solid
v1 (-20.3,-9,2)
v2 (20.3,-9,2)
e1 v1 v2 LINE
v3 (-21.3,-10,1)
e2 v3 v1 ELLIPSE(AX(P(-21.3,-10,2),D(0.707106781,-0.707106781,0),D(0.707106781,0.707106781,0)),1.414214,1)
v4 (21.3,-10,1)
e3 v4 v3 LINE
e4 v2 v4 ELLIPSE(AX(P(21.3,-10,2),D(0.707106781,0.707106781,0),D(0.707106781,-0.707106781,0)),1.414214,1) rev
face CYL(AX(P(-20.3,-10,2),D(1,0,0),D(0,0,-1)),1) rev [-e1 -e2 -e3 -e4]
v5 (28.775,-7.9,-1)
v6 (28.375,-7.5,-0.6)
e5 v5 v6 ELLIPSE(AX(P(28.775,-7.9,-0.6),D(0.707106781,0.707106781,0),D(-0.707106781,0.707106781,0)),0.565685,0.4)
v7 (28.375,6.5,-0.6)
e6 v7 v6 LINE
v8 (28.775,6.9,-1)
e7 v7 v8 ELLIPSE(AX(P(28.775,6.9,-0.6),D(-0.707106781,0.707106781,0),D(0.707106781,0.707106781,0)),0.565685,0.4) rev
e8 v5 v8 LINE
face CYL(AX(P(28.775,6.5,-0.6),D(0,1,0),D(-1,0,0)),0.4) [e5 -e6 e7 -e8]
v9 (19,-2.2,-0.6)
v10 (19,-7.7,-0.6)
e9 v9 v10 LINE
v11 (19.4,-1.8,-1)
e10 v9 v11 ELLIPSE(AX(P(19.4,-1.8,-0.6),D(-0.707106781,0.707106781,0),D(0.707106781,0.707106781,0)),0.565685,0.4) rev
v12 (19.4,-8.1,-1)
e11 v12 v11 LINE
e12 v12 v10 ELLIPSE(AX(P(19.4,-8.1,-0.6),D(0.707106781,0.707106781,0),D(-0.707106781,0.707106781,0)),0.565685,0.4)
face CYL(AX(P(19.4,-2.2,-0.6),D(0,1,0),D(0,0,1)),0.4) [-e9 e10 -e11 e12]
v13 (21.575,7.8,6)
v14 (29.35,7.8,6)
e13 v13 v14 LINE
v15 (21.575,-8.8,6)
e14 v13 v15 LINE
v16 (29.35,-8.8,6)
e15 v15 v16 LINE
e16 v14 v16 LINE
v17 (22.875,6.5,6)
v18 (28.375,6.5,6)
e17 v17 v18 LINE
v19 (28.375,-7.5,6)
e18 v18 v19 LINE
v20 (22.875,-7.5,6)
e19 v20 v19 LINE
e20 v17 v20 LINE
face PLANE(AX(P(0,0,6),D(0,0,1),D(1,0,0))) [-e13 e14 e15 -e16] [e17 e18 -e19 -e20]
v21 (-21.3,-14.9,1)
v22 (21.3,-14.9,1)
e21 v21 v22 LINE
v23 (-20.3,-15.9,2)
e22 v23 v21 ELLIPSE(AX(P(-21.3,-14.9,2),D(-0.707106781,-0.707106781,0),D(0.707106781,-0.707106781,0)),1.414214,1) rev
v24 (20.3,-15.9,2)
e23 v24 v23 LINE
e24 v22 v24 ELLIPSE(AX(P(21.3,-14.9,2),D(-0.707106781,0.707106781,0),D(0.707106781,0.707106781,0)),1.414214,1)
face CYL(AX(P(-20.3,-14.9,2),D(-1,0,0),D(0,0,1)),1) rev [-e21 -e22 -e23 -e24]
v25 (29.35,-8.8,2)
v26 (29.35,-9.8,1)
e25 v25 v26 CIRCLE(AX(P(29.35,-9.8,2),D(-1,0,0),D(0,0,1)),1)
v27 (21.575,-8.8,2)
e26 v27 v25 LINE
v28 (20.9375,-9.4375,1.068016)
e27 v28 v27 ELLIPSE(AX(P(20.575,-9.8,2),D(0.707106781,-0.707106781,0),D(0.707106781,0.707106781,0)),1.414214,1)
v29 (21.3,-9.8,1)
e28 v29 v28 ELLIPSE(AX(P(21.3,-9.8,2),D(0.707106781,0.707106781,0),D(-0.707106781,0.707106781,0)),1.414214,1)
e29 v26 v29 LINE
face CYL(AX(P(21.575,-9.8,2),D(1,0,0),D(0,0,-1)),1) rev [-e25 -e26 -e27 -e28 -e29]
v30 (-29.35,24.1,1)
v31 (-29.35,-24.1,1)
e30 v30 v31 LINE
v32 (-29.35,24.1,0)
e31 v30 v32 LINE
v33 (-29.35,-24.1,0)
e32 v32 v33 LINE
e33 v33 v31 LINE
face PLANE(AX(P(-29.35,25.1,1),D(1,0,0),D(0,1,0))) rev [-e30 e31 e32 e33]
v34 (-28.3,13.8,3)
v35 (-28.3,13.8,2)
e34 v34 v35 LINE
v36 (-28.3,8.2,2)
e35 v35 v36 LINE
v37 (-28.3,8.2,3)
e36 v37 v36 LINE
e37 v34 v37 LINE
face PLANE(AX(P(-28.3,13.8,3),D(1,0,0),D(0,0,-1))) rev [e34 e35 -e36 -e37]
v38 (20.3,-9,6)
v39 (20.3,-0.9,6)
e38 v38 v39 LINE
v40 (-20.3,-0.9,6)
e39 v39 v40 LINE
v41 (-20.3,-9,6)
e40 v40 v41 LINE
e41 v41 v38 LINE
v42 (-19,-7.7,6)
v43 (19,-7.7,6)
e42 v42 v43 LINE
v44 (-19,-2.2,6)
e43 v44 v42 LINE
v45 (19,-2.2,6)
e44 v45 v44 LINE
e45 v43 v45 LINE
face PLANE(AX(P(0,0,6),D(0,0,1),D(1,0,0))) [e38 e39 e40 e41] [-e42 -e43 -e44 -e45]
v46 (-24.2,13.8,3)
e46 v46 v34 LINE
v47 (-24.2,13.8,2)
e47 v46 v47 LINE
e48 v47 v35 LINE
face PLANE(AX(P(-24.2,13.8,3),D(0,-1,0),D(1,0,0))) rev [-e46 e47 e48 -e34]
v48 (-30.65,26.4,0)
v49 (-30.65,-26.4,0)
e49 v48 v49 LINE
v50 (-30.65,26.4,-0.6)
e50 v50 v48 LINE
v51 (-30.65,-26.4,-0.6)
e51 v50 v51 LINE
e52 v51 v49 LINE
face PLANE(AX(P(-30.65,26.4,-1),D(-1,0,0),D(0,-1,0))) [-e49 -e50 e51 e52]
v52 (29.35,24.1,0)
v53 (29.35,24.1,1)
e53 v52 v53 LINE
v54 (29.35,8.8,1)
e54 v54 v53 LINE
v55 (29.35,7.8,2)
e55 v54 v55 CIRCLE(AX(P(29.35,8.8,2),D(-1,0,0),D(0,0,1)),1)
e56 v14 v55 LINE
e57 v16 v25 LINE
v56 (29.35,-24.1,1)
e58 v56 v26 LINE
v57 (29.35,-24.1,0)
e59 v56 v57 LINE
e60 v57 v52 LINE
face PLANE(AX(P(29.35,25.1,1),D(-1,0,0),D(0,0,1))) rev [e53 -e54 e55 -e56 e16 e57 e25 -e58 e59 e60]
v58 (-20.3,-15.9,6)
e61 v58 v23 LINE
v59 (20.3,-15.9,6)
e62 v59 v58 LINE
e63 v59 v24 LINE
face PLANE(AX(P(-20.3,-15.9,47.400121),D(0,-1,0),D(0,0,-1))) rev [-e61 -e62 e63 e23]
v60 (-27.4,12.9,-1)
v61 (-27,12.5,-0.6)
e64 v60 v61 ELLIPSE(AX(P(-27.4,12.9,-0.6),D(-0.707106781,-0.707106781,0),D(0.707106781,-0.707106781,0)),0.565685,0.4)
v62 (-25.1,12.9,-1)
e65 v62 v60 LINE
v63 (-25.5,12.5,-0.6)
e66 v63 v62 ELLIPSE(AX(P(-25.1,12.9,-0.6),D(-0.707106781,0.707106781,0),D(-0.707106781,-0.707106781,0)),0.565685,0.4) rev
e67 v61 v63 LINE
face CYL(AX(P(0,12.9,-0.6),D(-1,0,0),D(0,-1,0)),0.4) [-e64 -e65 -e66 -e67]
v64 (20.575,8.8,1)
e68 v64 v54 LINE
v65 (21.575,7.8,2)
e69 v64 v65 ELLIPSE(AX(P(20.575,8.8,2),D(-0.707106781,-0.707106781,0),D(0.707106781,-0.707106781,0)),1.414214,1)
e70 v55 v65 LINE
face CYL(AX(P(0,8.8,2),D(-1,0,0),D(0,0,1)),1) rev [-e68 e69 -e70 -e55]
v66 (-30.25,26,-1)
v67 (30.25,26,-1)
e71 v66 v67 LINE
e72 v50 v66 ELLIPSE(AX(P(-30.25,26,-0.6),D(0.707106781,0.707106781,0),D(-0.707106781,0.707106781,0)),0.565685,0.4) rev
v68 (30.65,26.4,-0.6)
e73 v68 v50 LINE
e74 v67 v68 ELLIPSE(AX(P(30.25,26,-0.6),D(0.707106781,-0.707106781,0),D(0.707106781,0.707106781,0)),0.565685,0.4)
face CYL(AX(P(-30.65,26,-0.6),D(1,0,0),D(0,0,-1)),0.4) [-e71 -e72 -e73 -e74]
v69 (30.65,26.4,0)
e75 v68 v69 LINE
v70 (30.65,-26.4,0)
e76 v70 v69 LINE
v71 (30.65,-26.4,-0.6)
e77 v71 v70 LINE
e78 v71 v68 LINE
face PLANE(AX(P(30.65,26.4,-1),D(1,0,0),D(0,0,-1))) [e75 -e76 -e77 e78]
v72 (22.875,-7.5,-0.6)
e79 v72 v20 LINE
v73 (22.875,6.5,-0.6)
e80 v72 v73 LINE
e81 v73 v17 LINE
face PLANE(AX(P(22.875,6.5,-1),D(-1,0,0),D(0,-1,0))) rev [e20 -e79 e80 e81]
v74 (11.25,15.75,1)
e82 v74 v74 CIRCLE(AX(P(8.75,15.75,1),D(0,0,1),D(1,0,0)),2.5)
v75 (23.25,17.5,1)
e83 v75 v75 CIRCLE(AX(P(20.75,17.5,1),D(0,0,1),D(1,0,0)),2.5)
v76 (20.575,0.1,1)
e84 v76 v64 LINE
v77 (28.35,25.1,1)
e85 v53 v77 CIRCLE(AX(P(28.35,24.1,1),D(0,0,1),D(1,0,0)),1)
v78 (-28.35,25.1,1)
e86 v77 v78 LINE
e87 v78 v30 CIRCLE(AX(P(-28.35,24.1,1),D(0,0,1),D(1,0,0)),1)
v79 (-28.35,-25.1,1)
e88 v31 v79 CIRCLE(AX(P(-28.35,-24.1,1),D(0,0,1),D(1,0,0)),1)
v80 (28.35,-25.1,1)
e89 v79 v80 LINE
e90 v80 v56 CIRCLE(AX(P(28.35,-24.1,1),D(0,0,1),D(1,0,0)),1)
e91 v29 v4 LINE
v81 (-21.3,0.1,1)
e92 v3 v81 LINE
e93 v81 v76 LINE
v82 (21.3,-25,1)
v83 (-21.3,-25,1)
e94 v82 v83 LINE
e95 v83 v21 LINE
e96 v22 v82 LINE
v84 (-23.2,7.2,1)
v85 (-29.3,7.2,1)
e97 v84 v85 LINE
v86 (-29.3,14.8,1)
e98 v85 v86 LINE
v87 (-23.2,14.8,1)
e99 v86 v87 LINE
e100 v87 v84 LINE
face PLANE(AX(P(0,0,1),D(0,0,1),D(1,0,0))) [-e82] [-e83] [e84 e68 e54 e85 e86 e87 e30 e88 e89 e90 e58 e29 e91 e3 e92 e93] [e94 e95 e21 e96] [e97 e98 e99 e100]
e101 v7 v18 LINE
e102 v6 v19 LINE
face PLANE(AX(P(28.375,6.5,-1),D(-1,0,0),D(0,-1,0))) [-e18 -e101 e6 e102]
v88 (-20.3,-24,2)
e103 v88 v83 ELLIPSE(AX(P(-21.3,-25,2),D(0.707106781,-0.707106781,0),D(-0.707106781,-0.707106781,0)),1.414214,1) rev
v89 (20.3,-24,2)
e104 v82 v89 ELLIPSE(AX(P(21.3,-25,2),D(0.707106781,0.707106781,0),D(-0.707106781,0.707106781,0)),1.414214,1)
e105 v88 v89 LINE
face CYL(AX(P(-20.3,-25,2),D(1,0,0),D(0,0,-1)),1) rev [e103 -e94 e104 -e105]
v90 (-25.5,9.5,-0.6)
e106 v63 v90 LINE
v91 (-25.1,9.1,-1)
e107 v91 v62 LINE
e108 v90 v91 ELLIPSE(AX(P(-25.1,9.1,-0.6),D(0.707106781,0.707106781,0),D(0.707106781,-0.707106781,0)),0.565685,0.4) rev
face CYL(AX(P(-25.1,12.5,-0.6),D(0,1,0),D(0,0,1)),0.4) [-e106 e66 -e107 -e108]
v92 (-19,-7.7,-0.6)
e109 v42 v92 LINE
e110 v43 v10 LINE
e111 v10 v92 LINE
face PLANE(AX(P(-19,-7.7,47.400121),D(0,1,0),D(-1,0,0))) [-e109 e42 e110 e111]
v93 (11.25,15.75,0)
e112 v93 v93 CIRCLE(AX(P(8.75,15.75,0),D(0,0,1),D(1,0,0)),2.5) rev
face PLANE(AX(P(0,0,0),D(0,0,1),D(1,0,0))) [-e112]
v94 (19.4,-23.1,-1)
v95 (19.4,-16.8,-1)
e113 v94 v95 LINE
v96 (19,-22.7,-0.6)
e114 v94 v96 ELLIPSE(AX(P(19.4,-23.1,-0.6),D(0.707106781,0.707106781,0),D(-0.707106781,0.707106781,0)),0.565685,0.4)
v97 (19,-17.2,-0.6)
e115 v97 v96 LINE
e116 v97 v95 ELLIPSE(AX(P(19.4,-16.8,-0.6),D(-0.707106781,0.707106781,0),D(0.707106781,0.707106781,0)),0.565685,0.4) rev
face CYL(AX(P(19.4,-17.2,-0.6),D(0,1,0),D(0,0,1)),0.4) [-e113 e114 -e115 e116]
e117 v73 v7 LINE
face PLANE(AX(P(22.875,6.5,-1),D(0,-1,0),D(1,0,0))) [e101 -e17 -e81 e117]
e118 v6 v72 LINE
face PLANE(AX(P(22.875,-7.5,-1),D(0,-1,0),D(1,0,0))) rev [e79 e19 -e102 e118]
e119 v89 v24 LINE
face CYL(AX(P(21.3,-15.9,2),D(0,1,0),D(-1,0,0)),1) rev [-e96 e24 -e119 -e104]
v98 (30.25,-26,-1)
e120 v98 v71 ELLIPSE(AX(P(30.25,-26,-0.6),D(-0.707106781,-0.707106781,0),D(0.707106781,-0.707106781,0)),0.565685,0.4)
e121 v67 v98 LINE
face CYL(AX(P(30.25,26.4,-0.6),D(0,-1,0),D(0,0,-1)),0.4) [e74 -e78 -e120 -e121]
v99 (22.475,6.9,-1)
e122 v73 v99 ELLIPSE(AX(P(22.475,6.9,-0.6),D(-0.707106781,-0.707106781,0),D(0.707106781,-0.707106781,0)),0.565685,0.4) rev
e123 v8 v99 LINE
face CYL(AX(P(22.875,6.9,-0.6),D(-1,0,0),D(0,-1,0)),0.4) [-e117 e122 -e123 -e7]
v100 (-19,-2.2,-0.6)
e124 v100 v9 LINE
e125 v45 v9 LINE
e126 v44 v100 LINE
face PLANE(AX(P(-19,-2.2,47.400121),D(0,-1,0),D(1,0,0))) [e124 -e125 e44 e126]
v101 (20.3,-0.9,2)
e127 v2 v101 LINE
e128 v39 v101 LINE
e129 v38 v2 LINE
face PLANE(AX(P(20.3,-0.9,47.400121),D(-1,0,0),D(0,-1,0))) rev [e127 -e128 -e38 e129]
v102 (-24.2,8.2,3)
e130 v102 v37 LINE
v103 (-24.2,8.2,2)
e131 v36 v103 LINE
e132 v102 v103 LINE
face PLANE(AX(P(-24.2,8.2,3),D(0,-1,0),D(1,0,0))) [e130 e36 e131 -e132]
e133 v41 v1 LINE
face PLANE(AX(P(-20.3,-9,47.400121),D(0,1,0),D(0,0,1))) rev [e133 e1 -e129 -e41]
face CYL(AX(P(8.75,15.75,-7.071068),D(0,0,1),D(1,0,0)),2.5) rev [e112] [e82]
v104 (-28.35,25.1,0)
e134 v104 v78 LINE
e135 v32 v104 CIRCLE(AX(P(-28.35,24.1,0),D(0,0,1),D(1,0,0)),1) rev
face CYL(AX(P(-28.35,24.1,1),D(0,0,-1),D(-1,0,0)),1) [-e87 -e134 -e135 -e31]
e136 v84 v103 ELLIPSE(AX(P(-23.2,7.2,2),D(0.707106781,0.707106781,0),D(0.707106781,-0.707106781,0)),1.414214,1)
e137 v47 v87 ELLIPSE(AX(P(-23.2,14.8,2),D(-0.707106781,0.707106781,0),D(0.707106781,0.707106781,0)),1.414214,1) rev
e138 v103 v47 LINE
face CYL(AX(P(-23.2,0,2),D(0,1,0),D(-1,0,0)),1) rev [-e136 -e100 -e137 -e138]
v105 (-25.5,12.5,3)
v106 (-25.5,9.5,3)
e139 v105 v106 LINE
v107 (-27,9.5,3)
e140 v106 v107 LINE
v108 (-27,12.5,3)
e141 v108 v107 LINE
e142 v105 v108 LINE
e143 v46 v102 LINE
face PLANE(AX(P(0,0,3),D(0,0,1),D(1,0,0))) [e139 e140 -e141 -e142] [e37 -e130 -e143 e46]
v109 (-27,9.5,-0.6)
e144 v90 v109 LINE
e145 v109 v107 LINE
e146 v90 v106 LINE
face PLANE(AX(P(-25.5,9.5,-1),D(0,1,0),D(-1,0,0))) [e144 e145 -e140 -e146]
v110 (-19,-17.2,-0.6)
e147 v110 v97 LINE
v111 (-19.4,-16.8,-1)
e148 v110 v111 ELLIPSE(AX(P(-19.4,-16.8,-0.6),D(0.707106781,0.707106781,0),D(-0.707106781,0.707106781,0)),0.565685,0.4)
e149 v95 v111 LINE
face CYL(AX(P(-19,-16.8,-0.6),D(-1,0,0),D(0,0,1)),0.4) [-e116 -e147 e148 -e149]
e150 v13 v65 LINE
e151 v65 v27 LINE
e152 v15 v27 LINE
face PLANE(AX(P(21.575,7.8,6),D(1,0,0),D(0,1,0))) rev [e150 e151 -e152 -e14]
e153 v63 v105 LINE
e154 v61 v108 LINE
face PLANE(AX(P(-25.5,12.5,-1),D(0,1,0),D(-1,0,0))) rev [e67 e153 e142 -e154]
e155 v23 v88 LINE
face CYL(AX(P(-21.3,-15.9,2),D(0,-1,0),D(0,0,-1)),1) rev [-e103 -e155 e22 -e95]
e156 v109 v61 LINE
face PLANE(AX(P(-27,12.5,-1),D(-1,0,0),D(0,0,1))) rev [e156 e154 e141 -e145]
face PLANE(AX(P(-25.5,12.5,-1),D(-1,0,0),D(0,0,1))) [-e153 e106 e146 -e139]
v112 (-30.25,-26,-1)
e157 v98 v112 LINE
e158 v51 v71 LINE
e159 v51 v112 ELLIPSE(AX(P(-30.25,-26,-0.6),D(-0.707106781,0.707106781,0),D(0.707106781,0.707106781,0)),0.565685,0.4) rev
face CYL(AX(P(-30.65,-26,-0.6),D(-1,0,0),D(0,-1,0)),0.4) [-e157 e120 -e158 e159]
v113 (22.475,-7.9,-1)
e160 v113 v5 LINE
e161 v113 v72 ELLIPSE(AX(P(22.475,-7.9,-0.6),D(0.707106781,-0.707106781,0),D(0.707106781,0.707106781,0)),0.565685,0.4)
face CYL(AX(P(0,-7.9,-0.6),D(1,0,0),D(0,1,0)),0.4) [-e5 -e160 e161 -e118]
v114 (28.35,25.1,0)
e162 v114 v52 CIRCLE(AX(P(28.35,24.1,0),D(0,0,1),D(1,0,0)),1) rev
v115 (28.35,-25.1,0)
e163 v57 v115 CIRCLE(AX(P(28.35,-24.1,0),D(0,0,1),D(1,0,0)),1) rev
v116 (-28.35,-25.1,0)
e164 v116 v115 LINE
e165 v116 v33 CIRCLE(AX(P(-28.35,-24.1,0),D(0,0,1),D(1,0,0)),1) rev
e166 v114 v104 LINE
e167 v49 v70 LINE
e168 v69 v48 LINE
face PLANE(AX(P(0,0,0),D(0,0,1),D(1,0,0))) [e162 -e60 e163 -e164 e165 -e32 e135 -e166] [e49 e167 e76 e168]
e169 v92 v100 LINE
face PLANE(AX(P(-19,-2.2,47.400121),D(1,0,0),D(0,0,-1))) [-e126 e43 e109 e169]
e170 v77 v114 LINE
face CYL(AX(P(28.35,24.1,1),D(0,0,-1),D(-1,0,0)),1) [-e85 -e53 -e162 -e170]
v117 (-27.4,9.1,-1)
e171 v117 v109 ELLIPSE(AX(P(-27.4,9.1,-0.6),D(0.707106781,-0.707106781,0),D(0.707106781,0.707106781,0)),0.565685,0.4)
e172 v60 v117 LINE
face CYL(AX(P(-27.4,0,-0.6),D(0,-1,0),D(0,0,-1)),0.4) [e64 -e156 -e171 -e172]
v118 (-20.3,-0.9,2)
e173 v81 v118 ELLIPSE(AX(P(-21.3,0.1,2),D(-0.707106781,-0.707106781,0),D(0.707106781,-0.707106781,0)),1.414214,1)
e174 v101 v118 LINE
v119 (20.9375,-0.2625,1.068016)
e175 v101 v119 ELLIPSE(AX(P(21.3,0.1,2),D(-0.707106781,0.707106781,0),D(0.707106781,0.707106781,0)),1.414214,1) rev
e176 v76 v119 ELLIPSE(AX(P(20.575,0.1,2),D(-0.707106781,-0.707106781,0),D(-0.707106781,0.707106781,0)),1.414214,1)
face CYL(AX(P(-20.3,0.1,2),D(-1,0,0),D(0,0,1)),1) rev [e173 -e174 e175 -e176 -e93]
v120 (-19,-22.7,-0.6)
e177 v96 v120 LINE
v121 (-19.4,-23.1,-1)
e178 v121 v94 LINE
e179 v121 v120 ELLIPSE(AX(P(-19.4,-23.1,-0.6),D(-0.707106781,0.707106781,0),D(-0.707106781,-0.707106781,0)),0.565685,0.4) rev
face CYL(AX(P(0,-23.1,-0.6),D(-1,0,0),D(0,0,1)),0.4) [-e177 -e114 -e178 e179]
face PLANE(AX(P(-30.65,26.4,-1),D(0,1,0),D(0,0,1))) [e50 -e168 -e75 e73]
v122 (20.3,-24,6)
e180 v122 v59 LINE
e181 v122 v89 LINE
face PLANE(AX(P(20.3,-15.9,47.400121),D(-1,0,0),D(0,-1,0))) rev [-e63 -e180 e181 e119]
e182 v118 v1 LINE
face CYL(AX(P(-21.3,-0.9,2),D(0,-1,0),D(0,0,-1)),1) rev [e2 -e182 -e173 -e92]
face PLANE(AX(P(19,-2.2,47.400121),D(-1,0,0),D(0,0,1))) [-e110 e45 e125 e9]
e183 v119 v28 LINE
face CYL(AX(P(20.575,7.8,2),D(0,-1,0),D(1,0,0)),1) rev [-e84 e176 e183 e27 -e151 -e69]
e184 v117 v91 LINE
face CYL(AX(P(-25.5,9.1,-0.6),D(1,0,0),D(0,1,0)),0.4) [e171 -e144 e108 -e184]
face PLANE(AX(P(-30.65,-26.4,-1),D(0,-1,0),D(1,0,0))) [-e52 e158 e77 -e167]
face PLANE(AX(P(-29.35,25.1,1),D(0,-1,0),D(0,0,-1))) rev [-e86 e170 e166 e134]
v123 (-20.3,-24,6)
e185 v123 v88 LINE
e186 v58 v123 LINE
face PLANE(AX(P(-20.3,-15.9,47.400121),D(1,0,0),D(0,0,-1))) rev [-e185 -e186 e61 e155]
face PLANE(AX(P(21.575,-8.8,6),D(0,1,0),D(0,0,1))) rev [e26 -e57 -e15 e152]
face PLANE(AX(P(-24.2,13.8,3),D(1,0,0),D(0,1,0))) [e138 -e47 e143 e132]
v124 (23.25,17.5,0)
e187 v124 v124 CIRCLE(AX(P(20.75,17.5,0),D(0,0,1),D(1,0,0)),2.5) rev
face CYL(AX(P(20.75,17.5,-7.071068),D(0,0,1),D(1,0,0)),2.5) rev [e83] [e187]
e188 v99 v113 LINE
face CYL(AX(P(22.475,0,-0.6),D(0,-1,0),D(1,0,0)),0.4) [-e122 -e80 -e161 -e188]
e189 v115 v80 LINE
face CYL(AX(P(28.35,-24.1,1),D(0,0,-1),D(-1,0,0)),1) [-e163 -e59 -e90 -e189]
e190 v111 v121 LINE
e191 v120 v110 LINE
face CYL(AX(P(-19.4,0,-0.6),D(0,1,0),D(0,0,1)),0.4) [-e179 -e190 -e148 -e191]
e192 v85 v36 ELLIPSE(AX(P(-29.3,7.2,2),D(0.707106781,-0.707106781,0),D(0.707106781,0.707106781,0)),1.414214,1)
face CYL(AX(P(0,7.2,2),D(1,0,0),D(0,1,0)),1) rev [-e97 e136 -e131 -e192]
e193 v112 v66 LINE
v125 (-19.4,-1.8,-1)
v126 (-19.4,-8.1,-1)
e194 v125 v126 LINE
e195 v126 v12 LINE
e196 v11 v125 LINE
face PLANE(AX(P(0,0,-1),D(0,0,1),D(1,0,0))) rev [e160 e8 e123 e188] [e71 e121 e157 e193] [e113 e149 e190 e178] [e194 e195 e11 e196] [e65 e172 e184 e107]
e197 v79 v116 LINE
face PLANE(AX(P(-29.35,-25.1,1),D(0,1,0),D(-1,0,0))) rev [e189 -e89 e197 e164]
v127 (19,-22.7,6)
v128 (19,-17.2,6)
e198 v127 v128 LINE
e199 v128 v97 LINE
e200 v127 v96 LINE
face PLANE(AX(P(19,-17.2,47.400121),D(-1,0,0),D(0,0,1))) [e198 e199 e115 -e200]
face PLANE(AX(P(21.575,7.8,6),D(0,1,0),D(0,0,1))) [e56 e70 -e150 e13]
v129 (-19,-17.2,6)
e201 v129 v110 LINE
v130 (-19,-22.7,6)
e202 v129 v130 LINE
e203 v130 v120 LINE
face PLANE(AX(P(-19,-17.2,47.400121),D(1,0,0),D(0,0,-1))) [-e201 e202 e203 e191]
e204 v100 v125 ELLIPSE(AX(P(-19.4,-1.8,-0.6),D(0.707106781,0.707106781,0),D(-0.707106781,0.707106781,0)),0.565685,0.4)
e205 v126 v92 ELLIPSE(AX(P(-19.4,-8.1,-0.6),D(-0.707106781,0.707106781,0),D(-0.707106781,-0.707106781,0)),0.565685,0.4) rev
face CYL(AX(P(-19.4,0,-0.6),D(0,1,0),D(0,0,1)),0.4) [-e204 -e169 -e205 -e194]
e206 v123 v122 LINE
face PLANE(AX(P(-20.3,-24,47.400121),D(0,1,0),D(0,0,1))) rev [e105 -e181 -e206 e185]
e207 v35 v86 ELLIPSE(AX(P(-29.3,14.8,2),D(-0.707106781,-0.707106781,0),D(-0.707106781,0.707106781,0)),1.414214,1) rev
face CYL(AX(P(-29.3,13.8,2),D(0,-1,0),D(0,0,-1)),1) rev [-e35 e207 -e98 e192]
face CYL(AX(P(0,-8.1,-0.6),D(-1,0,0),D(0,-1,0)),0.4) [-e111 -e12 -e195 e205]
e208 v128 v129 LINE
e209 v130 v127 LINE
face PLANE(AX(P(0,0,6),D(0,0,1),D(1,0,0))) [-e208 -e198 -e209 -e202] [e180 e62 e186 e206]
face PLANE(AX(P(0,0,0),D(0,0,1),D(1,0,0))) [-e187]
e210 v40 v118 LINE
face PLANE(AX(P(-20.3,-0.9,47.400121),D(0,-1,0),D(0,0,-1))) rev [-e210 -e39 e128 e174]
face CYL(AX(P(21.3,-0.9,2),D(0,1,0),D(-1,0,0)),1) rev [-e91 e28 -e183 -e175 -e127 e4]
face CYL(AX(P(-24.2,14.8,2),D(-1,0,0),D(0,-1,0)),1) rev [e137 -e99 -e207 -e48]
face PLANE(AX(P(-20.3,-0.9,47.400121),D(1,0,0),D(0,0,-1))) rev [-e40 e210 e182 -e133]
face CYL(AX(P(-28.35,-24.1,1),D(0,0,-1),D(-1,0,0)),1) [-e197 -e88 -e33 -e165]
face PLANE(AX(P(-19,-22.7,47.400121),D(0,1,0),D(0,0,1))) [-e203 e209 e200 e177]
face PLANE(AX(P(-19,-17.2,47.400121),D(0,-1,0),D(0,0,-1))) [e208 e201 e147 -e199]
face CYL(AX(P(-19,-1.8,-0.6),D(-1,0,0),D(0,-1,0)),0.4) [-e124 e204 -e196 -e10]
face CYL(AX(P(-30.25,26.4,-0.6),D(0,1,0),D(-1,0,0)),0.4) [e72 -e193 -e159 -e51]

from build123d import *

# Parameters (mm, degrees)
OUTSIDE_DIM_W                         = 61.3
OUTSIDE_DIM_H                         = 52.8
DODANIE_WYCI_GNI_CIE1_DEPTH           = 1
INSIDE_DIM_W                          = 58.7
INSIDE_DIM_H                          = 50.2
DODANIE_WYCI_GNI_CIE2_DEPTH           = 1
CAPACITORS_R                          = 2.5
CAPACITORS_CUTOUT_DEPTH               = 1
RESET_BUTTON_W                        = 4.1
RESET_BUTTON_H                        = 5.6
RESET_BUTTON_SHIELD_DEPTH             = 2
RESET_BUTTON_CUTOUT_DEPTH             = 41.501635769
RESET_BUTTON_CUTOUT_DEPTH_BACK        = 41.501635769
SZKIC5_3_W                            = 1.5
SZKIC5_3_H                            = 3
SWDIO_W                               = 7.775
SWDIO_H                               = 16.6
SWDIO_SHIELD_DEPTH                    = 5
SWDIO_CUTOUT_DEPTH                    = 41.760060108
SWDIO_CUTOUT_DEPTH_BACK               = 41.760060108
SZKIC6_3_W                            = 5.5
SZKIC6_3_H                            = 14
ART_SKIN_CONNECTORS_W                 = 40.6
ART_SKIN_CONNECTORS_H                 = 8.1
ART_SKIN_CONNECTORS_W_2               = 38
ART_SKIN_CONNECTORS_H_2               = 5.5
ART_SKIN_CONNECTORS_SHIELD_DEPTH      = 5
ART_SKIN_CONNECTORS_CUTOUT_DEPTH      = 41.760060108
ART_SKIN_CONNECTORS_CUTOUT_DEPTH_BACK = 41.760060108
SZKIC7_2_W                            = 38
SZKIC7_2_H                            = 5.5
BOTTOM_OF_PRINT_CURVE_R               = 0.4
SIDE_MOUNT_SURVE_R                    = 1
CURVE_ALL_SHIELDS_R                   = 1


with BuildPart() as part:
    # Outside dim → Dodanie-wyciągnięcie1 (new body)
    with BuildSketch(Plane.XY):
        Rectangle(OUTSIDE_DIM_W, OUTSIDE_DIM_H)
    extrude(amount=-DODANIE_WYCI_GNI_CIE1_DEPTH)

    # Inside dim → Dodanie-wyciągnięcie2 (add)
    with BuildSketch(Plane.XY):
        Rectangle(INSIDE_DIM_W, INSIDE_DIM_H)
    extrude(amount=DODANIE_WYCI_GNI_CIE2_DEPTH)

    # Capacitors → Capacitors cutout (cut)
    with BuildSketch(Plane.XY.offset(1)):
        with Locations((8.75, 15.75)):
            Circle(CAPACITORS_R)
        with Locations((20.75, 17.5)):
            Circle(CAPACITORS_R)
    extrude(amount=-CAPACITORS_CUTOUT_DEPTH, mode=Mode.SUBTRACT)

    # Reset button → Reset button shield (add)
    with BuildSketch(Plane.XY.offset(1)):
        with Locations((-26.25, 11)):
            Rectangle(RESET_BUTTON_W, RESET_BUTTON_H)
    extrude(amount=RESET_BUTTON_SHIELD_DEPTH)

    # Szkic5<3> → Reset button cutout (cut, two sides: drawn at the far end of the back side and taken through both)
    with BuildSketch(Plane.XY.offset(1).offset(-RESET_BUTTON_CUTOUT_DEPTH_BACK)):
        with Locations((-26.25, 11)):
            Rectangle(SZKIC5_3_W, SZKIC5_3_H)
    extrude(amount=RESET_BUTTON_CUTOUT_DEPTH + RESET_BUTTON_CUTOUT_DEPTH_BACK, mode=Mode.SUBTRACT)

    # SWDIO → SWDIO shield (add)
    with BuildSketch(Plane.XY.offset(1)):
        with Locations((25.4625, -0.5)):
            Rectangle(SWDIO_W, SWDIO_H)
    extrude(amount=SWDIO_SHIELD_DEPTH)

    # Szkic6<3> → SWDIO cutout (cut, two sides: drawn at the far end of the back side and taken through both)
    with BuildSketch(Plane.XY.offset(1).offset(-SWDIO_CUTOUT_DEPTH_BACK)):
        with Locations((25.625, -0.5)):
            Rectangle(SZKIC6_3_W, SZKIC6_3_H)
    extrude(amount=SWDIO_CUTOUT_DEPTH + SWDIO_CUTOUT_DEPTH_BACK, mode=Mode.SUBTRACT)

    # Art skin connectors → Art skin connectors shield (add)
    # profile 1 of 2: a face of its own
    with BuildSketch(Plane.XY.offset(1)):
        with Locations((0, -19.95)):
            Rectangle(ART_SKIN_CONNECTORS_W, ART_SKIN_CONNECTORS_H)
        with Locations((0, -19.95)):
            Rectangle(ART_SKIN_CONNECTORS_W_2, ART_SKIN_CONNECTORS_H_2, mode=Mode.SUBTRACT)
    # profile 2 of 2: a face of its own
    with BuildSketch(Plane.XY.offset(1)):
        with Locations((0, -4.95)):
            Rectangle(ART_SKIN_CONNECTORS_W, ART_SKIN_CONNECTORS_H)
        with Locations((0, -4.95)):
            Rectangle(ART_SKIN_CONNECTORS_W_2, ART_SKIN_CONNECTORS_H_2, mode=Mode.SUBTRACT)
    extrude(amount=ART_SKIN_CONNECTORS_SHIELD_DEPTH)

    # Szkic7<2> → Art skin connectors cutout (cut, two sides: drawn at the far end of the back side and taken through both)
    with BuildSketch(Plane.XY.offset(1).offset(-ART_SKIN_CONNECTORS_CUTOUT_DEPTH_BACK)):
        with Locations((0, -4.95)):
            Rectangle(SZKIC7_2_W, SZKIC7_2_H)
        with Locations((0, -19.95)):
            Rectangle(SZKIC7_2_W, SZKIC7_2_H)
    extrude(amount=ART_SKIN_CONNECTORS_CUTOUT_DEPTH + ART_SKIN_CONNECTORS_CUTOUT_DEPTH_BACK, mode=Mode.SUBTRACT)

    # Bottom of print curve
    bottom_of_print_curve_edges = [part.edges().sort_by_distance(p)[0] for p in [
        (30.65, 0, -1),
        (0, -22.7, -1),
        (-19, -19.95, -1),
        (0, -17.2, -1),
        (19, -19.95, -1),
        (-19, -4.95, -1),
        (0, -7.7, -1),
        (0, -2.2, -1),
        (19, -4.95, -1),
        (0, 26.4, -1),
        (-30.65, 0, -1),
        (-27, 11, -1),
        (-26.25, 12.5, -1),
        (-25.5, 11, -1),
        (-26.25, 9.5, -1),
        (22.875, -0.5, -1),
        (25.625, -7.5, -1),
        (25.625, 6.5, -1),
        (28.375, -0.5, -1),
        (0, -26.4, -1),
    ]]
    fillet(bottom_of_print_curve_edges, radius=BOTTOM_OF_PRINT_CURVE_R)

    # Side mount surve
    side_mount_surve_edges = [part.edges().sort_by_distance(p)[0] for p in [
        (-29.35, 25.1, 0.5),
        (-29.35, -25.1, 0.5),
        (29.35, -25.1, 0.5),
        (29.35, 25.1, 0.5),
    ]]
    fillet(side_mount_surve_edges, radius=SIDE_MOUNT_SURVE_R)

    # Curve all shields
    # the kernel refuses this fillet: 1 mm, written as the material it adds along each edge
    with BuildSketch(Plane(origin=(-20.3, -24, 1), x_dir=(-1, 0, 0), z_dir=(0, 1, 0)), Plane(origin=(20.3, -0.9, 1), x_dir=(1, 0, 0), z_dir=(0, -1, 0)), Plane(origin=(-20.3, -9, 1), x_dir=(-1, 0, 0), z_dir=(0, 1, 0)), Plane(origin=(20.3, -15.9, 1), x_dir=(1, 0, 0), z_dir=(0, -1, 0))) as curve_all_shields_piece_1:
        with BuildLine():
            CenterArc((CURVE_ALL_SHIELDS_R, CURVE_ALL_SHIELDS_R), CURVE_ALL_SHIELDS_R, 180, 90)
            Line((0, CURVE_ALL_SHIELDS_R), (0, 0))
            Line((0, 0), (CURVE_ALL_SHIELDS_R, 0))
        make_face()
    extrude(amount=8.1)
    with BuildSketch(Plane(origin=(-20.3, -0.9, 1), x_dir=(0, 1, 0), z_dir=(1, 0, 0)), Plane(origin=(20.3, -9, 1), x_dir=(0, -1, 0), z_dir=(-1, 0, 0)), Plane(origin=(-20.3, -15.9, 1), x_dir=(0, 1, 0), z_dir=(1, 0, 0)), Plane(origin=(20.3, -24, 1), x_dir=(0, -1, 0), z_dir=(-1, 0, 0))) as curve_all_shields_piece_2:
        with BuildLine():
            CenterArc((CURVE_ALL_SHIELDS_R, CURVE_ALL_SHIELDS_R), CURVE_ALL_SHIELDS_R, 180, 90)
            Line((0, CURVE_ALL_SHIELDS_R), (0, 0))
            Line((0, 0), (CURVE_ALL_SHIELDS_R, 0))
        make_face()
    extrude(amount=40.6)
    with BuildSketch(Plane(origin=(-24.2, 13.8, 1), x_dir=(0, 1, 0), z_dir=(-1, 0, 0)), Plane(origin=(-28.3, 8.2, 1), x_dir=(0, -1, 0), z_dir=(1, 0, 0))) as curve_all_shields_piece_3:
        with BuildLine():
            CenterArc((CURVE_ALL_SHIELDS_R, -CURVE_ALL_SHIELDS_R), CURVE_ALL_SHIELDS_R, 90, 90)
            Line((0, -CURVE_ALL_SHIELDS_R), (0, 0))
            Line((0, 0), (CURVE_ALL_SHIELDS_R, 0))
        make_face()
    extrude(amount=4.1)
    with BuildSketch(Plane(origin=(-28.3, 13.8, 1), x_dir=(-1, 0, 0), z_dir=(0, -1, 0)), Plane(origin=(-24.2, 8.2, 1), x_dir=(1, 0, 0), z_dir=(0, 1, 0))) as curve_all_shields_piece_4:
        with BuildLine():
            CenterArc((CURVE_ALL_SHIELDS_R, -CURVE_ALL_SHIELDS_R), CURVE_ALL_SHIELDS_R, 90, 90)
            Line((0, -CURVE_ALL_SHIELDS_R), (0, 0))
            Line((0, 0), (CURVE_ALL_SHIELDS_R, 0))
        make_face()
    extrude(amount=5.6)
    with BuildSketch(Plane(origin=(21.575, -8.8, 1), x_dir=(-1, 0, 0), z_dir=(0, 1, 0))) as curve_all_shields_piece_5:
        with BuildLine():
            CenterArc((CURVE_ALL_SHIELDS_R, CURVE_ALL_SHIELDS_R), CURVE_ALL_SHIELDS_R, 180, 90)
            Line((0, CURVE_ALL_SHIELDS_R), (0, 0))
            Line((0, 0), (CURVE_ALL_SHIELDS_R, 0))
        make_face()
    extrude(amount=16.6)
    with BuildSketch(Plane(origin=(29.35, -8.8, 1), x_dir=(0, -1, 0), z_dir=(-1, 0, 0)), Plane(origin=(21.575, 7.8, 1), x_dir=(0, 1, 0), z_dir=(1, 0, 0))) as curve_all_shields_piece_6:
        with BuildLine():
            CenterArc((CURVE_ALL_SHIELDS_R, CURVE_ALL_SHIELDS_R), CURVE_ALL_SHIELDS_R, 180, 90)
            Line((0, CURVE_ALL_SHIELDS_R), (0, 0))
            Line((0, 0), (CURVE_ALL_SHIELDS_R, 0))
        make_face()
    extrude(amount=7.775)
    with BuildSketch(Plane(origin=(20.3, -24, 1), x_dir=(0, -1, 0), z_dir=(-1, 0, 0))) as curve_all_shields_piece_7a_section:
        with BuildLine():
            CenterArc((CURVE_ALL_SHIELDS_R, CURVE_ALL_SHIELDS_R), CURVE_ALL_SHIELDS_R, 180, 90)
            Line((0, CURVE_ALL_SHIELDS_R), (0, 0))
            Line((0, 0), (CURVE_ALL_SHIELDS_R, 0))
        make_face()
    curve_all_shields_piece_7a = extrude(amount=43.1, mode=Mode.PRIVATE)
    curve_all_shields_piece_7a = split(curve_all_shields_piece_7a, bisect_by=Plane(origin=(-20.3, -24.226395114, 1.226395114), z_dir=(-1, 0, 0)), keep=Keep.TOP, mode=Mode.PRIVATE)
    with BuildSketch(Plane(origin=(-20.3, -26.5, 1), x_dir=(-1, 0, 0), z_dir=(0, 1, 0))) as curve_all_shields_piece_7b_section:
        with BuildLine():
            CenterArc((CURVE_ALL_SHIELDS_R, CURVE_ALL_SHIELDS_R), CURVE_ALL_SHIELDS_R, 180, 90)
            Line((0, CURVE_ALL_SHIELDS_R), (0, 0))
            Line((0, 0), (CURVE_ALL_SHIELDS_R, 0))
        make_face()
    curve_all_shields_piece_7b = extrude(amount=10.6, mode=Mode.PRIVATE)
    curve_all_shields_piece_7b = split(curve_all_shields_piece_7b, bisect_by=Plane(origin=(-20.526395114, -25.1, 1.226395114), z_dir=(0, 1, 0)), keep=Keep.TOP, mode=Mode.PRIVATE)
    curve_all_shields_piece_7b = split(curve_all_shields_piece_7b, bisect_by=Plane(origin=(-20.526395114, -24, 1.226395114), z_dir=(0, -1, 0)), keep=Keep.TOP, mode=Mode.PRIVATE)
    curve_all_shields_piece_7 = curve_all_shields_piece_7a & curve_all_shields_piece_7b
    add(curve_all_shields_piece_7)
    with BuildSketch(Plane(origin=(-22.8, -15.9, 1), x_dir=(0, 1, 0), z_dir=(1, 0, 0))) as curve_all_shields_piece_8a_section:
        with BuildLine():
            CenterArc((CURVE_ALL_SHIELDS_R, CURVE_ALL_SHIELDS_R), CURVE_ALL_SHIELDS_R, 180, 90)
            Line((0, CURVE_ALL_SHIELDS_R), (0, 0))
            Line((0, 0), (CURVE_ALL_SHIELDS_R, 0))
        make_face()
    curve_all_shields_piece_8a = extrude(amount=43.1, mode=Mode.PRIVATE)
    curve_all_shields_piece_8a = split(curve_all_shields_piece_8a, bisect_by=Plane(origin=(-20.3, -15.673604886, 1.226395114), z_dir=(-1, 0, 0)), keep=Keep.TOP, mode=Mode.PRIVATE)
    with BuildSketch(Plane(origin=(-20.3, -24, 1), x_dir=(-1, 0, 0), z_dir=(0, 1, 0))) as curve_all_shields_piece_8b_section:
        with BuildLine():
            CenterArc((CURVE_ALL_SHIELDS_R, CURVE_ALL_SHIELDS_R), CURVE_ALL_SHIELDS_R, 180, 90)
            Line((0, CURVE_ALL_SHIELDS_R), (0, 0))
            Line((0, 0), (CURVE_ALL_SHIELDS_R, 0))
        make_face()
    curve_all_shields_piece_8b = extrude(amount=10.6, mode=Mode.PRIVATE)
    curve_all_shields_piece_8b = split(curve_all_shields_piece_8b, bisect_by=Plane(origin=(-20.526395114, -15.9, 1.226395114), z_dir=(0, 1, 0)), keep=Keep.TOP, mode=Mode.PRIVATE)
    curve_all_shields_piece_8 = curve_all_shields_piece_8a & curve_all_shields_piece_8b
    add(curve_all_shields_piece_8)
    with BuildSketch(Plane(origin=(-22.8, -0.9, 1), x_dir=(0, 1, 0), z_dir=(1, 0, 0))) as curve_all_shields_piece_9a_section:
        with BuildLine():
            CenterArc((CURVE_ALL_SHIELDS_R, CURVE_ALL_SHIELDS_R), CURVE_ALL_SHIELDS_R, 180, 90)
            Line((0, CURVE_ALL_SHIELDS_R), (0, 0))
            Line((0, 0), (CURVE_ALL_SHIELDS_R, 0))
        make_face()
    curve_all_shields_piece_9a = extrude(amount=43.1, mode=Mode.PRIVATE)
    curve_all_shields_piece_9a = split(curve_all_shields_piece_9a, bisect_by=Plane(origin=(-20.3, -0.673604886, 1.226395114), z_dir=(-1, 0, 0)), keep=Keep.TOP, mode=Mode.PRIVATE)
    with BuildSketch(Plane(origin=(-20.3, -9, 1), x_dir=(-1, 0, 0), z_dir=(0, 1, 0))) as curve_all_shields_piece_9b_section:
        with BuildLine():
            CenterArc((CURVE_ALL_SHIELDS_R, CURVE_ALL_SHIELDS_R), CURVE_ALL_SHIELDS_R, 180, 90)
            Line((0, CURVE_ALL_SHIELDS_R), (0, 0))
            Line((0, 0), (CURVE_ALL_SHIELDS_R, 0))
        make_face()
    curve_all_shields_piece_9b = extrude(amount=10.6, mode=Mode.PRIVATE)
    curve_all_shields_piece_9b = split(curve_all_shields_piece_9b, bisect_by=Plane(origin=(-20.526395114, -0.9, 1.226395114), z_dir=(0, 1, 0)), keep=Keep.TOP, mode=Mode.PRIVATE)
    curve_all_shields_piece_9 = curve_all_shields_piece_9a & curve_all_shields_piece_9b
    add(curve_all_shields_piece_9)
    with BuildSketch(Plane(origin=(-20.3, -0.9, 1), x_dir=(0, 1, 0), z_dir=(1, 0, 0))) as curve_all_shields_piece_10a_section:
        with BuildLine():
            CenterArc((CURVE_ALL_SHIELDS_R, CURVE_ALL_SHIELDS_R), CURVE_ALL_SHIELDS_R, 180, 90)
            Line((0, CURVE_ALL_SHIELDS_R), (0, 0))
            Line((0, 0), (CURVE_ALL_SHIELDS_R, 0))
        make_face()
    curve_all_shields_piece_10a = extrude(amount=43.1, mode=Mode.PRIVATE)
    curve_all_shields_piece_10a = split(curve_all_shields_piece_10a, bisect_by=Plane(origin=(20.3, -0.673604886, 1.226395114), z_dir=(1, 0, 0)), keep=Keep.TOP, mode=Mode.PRIVATE)
    with BuildSketch(Plane(origin=(20.3, 1.6, 1), x_dir=(1, 0, 0), z_dir=(0, -1, 0))) as curve_all_shields_piece_10b_section:
        with BuildLine():
            CenterArc((CURVE_ALL_SHIELDS_R, CURVE_ALL_SHIELDS_R), CURVE_ALL_SHIELDS_R, 180, 90)
            Line((0, CURVE_ALL_SHIELDS_R), (0, 0))
            Line((0, 0), (CURVE_ALL_SHIELDS_R, 0))
        make_face()
    curve_all_shields_piece_10b = extrude(amount=10.6, mode=Mode.PRIVATE)
    curve_all_shields_piece_10b = split(curve_all_shields_piece_10b, bisect_by=Plane(origin=(20.526395114, -0.9, 1.226395114), z_dir=(0, 1, 0)), keep=Keep.TOP, mode=Mode.PRIVATE)
    curve_all_shields_piece_10 = curve_all_shields_piece_10a & curve_all_shields_piece_10b
    add(curve_all_shields_piece_10)
    with BuildSketch(Plane(origin=(20.3, -0.9, 1), x_dir=(1, 0, 0), z_dir=(0, -1, 0))) as curve_all_shields_piece_11a_section:
        with BuildLine():
            CenterArc((CURVE_ALL_SHIELDS_R, CURVE_ALL_SHIELDS_R), CURVE_ALL_SHIELDS_R, 180, 90)
            Line((0, CURVE_ALL_SHIELDS_R), (0, 0))
            Line((0, 0), (CURVE_ALL_SHIELDS_R, 0))
        make_face()
    curve_all_shields_piece_11a = extrude(amount=10.6, mode=Mode.PRIVATE)
    curve_all_shields_piece_11a = split(curve_all_shields_piece_11a, bisect_by=Plane(origin=(20.526395114, -9, 1.226395114), z_dir=(0, -1, 0)), keep=Keep.TOP, mode=Mode.PRIVATE)
    with BuildSketch(Plane(origin=(22.8, -9, 1), x_dir=(0, -1, 0), z_dir=(-1, 0, 0))) as curve_all_shields_piece_11b_section:
        with BuildLine():
            CenterArc((CURVE_ALL_SHIELDS_R, CURVE_ALL_SHIELDS_R), CURVE_ALL_SHIELDS_R, 180, 90)
            Line((0, CURVE_ALL_SHIELDS_R), (0, 0))
            Line((0, 0), (CURVE_ALL_SHIELDS_R, 0))
        make_face()
    curve_all_shields_piece_11b = extrude(amount=43.1, mode=Mode.PRIVATE)
    curve_all_shields_piece_11b = split(curve_all_shields_piece_11b, bisect_by=Plane(origin=(20.3, -9.226395114, 1.226395114), z_dir=(1, 0, 0)), keep=Keep.TOP, mode=Mode.PRIVATE)
    curve_all_shields_piece_11 = curve_all_shields_piece_11a & curve_all_shields_piece_11b
    add(curve_all_shields_piece_11)
    with BuildSketch(Plane(origin=(20.3, -9, 1), x_dir=(0, -1, 0), z_dir=(-1, 0, 0))) as curve_all_shields_piece_12a_section:
        with BuildLine():
            CenterArc((CURVE_ALL_SHIELDS_R, CURVE_ALL_SHIELDS_R), CURVE_ALL_SHIELDS_R, 180, 90)
            Line((0, CURVE_ALL_SHIELDS_R), (0, 0))
            Line((0, 0), (CURVE_ALL_SHIELDS_R, 0))
        make_face()
    curve_all_shields_piece_12a = extrude(amount=43.1, mode=Mode.PRIVATE)
    curve_all_shields_piece_12a = split(curve_all_shields_piece_12a, bisect_by=Plane(origin=(-20.3, -9.226395114, 1.226395114), z_dir=(-1, 0, 0)), keep=Keep.TOP, mode=Mode.PRIVATE)
    with BuildSketch(Plane(origin=(-20.3, -11.5, 1), x_dir=(-1, 0, 0), z_dir=(0, 1, 0))) as curve_all_shields_piece_12b_section:
        with BuildLine():
            CenterArc((CURVE_ALL_SHIELDS_R, CURVE_ALL_SHIELDS_R), CURVE_ALL_SHIELDS_R, 180, 90)
            Line((0, CURVE_ALL_SHIELDS_R), (0, 0))
            Line((0, 0), (CURVE_ALL_SHIELDS_R, 0))
        make_face()
    curve_all_shields_piece_12b = extrude(amount=10.6, mode=Mode.PRIVATE)
    curve_all_shields_piece_12b = split(curve_all_shields_piece_12b, bisect_by=Plane(origin=(-20.526395114, -9, 1.226395114), z_dir=(0, -1, 0)), keep=Keep.TOP, mode=Mode.PRIVATE)
    curve_all_shields_piece_12 = curve_all_shields_piece_12a & curve_all_shields_piece_12b
    add(curve_all_shields_piece_12)
    with BuildSketch(Plane(origin=(-24.2, 8.2, 1), x_dir=(1, 0, 0), z_dir=(0, 1, 0))) as curve_all_shields_piece_13a_section:
        with BuildLine():
            CenterArc((CURVE_ALL_SHIELDS_R, -CURVE_ALL_SHIELDS_R), CURVE_ALL_SHIELDS_R, 90, 90)
            Line((0, -CURVE_ALL_SHIELDS_R), (0, 0))
            Line((0, 0), (CURVE_ALL_SHIELDS_R, 0))
        make_face()
    curve_all_shields_piece_13a = extrude(amount=8.1, mode=Mode.PRIVATE)
    curve_all_shields_piece_13a = split(curve_all_shields_piece_13a, bisect_by=Plane(origin=(-23.973604886, 13.8, 1.226395114), z_dir=(0, 1, 0)), keep=Keep.TOP, mode=Mode.PRIVATE)
    with BuildSketch(Plane(origin=(-21.7, 13.8, 1), x_dir=(0, 1, 0), z_dir=(-1, 0, 0))) as curve_all_shields_piece_13b_section:
        with BuildLine():
            CenterArc((CURVE_ALL_SHIELDS_R, -CURVE_ALL_SHIELDS_R), CURVE_ALL_SHIELDS_R, 90, 90)
            Line((0, -CURVE_ALL_SHIELDS_R), (0, 0))
            Line((0, 0), (CURVE_ALL_SHIELDS_R, 0))
        make_face()
    curve_all_shields_piece_13b = extrude(amount=6.6, mode=Mode.PRIVATE)
    curve_all_shields_piece_13b = split(curve_all_shields_piece_13b, bisect_by=Plane(origin=(-24.2, 14.026395114, 1.226395114), z_dir=(1, 0, 0)), keep=Keep.TOP, mode=Mode.PRIVATE)
    curve_all_shields_piece_13 = curve_all_shields_piece_13a & curve_all_shields_piece_13b
    add(curve_all_shields_piece_13)
    with BuildSketch(Plane(origin=(-24.2, 13.8, 1), x_dir=(0, 1, 0), z_dir=(-1, 0, 0))) as curve_all_shields_piece_14a_section:
        with BuildLine():
            CenterArc((CURVE_ALL_SHIELDS_R, -CURVE_ALL_SHIELDS_R), CURVE_ALL_SHIELDS_R, 90, 90)
            Line((0, -CURVE_ALL_SHIELDS_R), (0, 0))
            Line((0, 0), (CURVE_ALL_SHIELDS_R, 0))
        make_face()
    curve_all_shields_piece_14a = extrude(amount=6.6, mode=Mode.PRIVATE)
    curve_all_shields_piece_14a = split(curve_all_shields_piece_14a, bisect_by=Plane(origin=(-29.35, 14.026395114, 1.226395114), z_dir=(1, 0, 0)), keep=Keep.TOP, mode=Mode.PRIVATE)
    curve_all_shields_piece_14a = split(curve_all_shields_piece_14a, bisect_by=Plane(origin=(-28.3, 14.026395114, 1.226395114), z_dir=(-1, 0, 0)), keep=Keep.TOP, mode=Mode.PRIVATE)
    with BuildSketch(Plane(origin=(-28.3, 16.3, 1), x_dir=(-1, 0, 0), z_dir=(0, -1, 0))) as curve_all_shields_piece_14b_section:
        with BuildLine():
            CenterArc((CURVE_ALL_SHIELDS_R, -CURVE_ALL_SHIELDS_R), CURVE_ALL_SHIELDS_R, 90, 90)
            Line((0, -CURVE_ALL_SHIELDS_R), (0, 0))
            Line((0, 0), (CURVE_ALL_SHIELDS_R, 0))
        make_face()
    curve_all_shields_piece_14b = extrude(amount=8.1, mode=Mode.PRIVATE)
    curve_all_shields_piece_14b = split(curve_all_shields_piece_14b, bisect_by=Plane(origin=(-28.526395114, 13.8, 1.226395114), z_dir=(0, 1, 0)), keep=Keep.TOP, mode=Mode.PRIVATE)
    curve_all_shields_piece_14 = curve_all_shields_piece_14a & curve_all_shields_piece_14b
    add(curve_all_shields_piece_14)
    with BuildSketch(Plane(origin=(-30.8, 8.2, 1), x_dir=(0, -1, 0), z_dir=(1, 0, 0))) as curve_all_shields_piece_15a_section:
        with BuildLine():
            CenterArc((CURVE_ALL_SHIELDS_R, -CURVE_ALL_SHIELDS_R), CURVE_ALL_SHIELDS_R, 90, 90)
            Line((0, -CURVE_ALL_SHIELDS_R), (0, 0))
            Line((0, 0), (CURVE_ALL_SHIELDS_R, 0))
        make_face()
    curve_all_shields_piece_15a = extrude(amount=6.6, mode=Mode.PRIVATE)
    curve_all_shields_piece_15a = split(curve_all_shields_piece_15a, bisect_by=Plane(origin=(-29.35, 7.973604886, 1.226395114), z_dir=(1, 0, 0)), keep=Keep.TOP, mode=Mode.PRIVATE)
    curve_all_shields_piece_15a = split(curve_all_shields_piece_15a, bisect_by=Plane(origin=(-28.3, 7.973604886, 1.226395114), z_dir=(-1, 0, 0)), keep=Keep.TOP, mode=Mode.PRIVATE)
    with BuildSketch(Plane(origin=(-28.3, 13.8, 1), x_dir=(-1, 0, 0), z_dir=(0, -1, 0))) as curve_all_shields_piece_15b_section:
        with BuildLine():
            CenterArc((CURVE_ALL_SHIELDS_R, -CURVE_ALL_SHIELDS_R), CURVE_ALL_SHIELDS_R, 90, 90)
            Line((0, -CURVE_ALL_SHIELDS_R), (0, 0))
            Line((0, 0), (CURVE_ALL_SHIELDS_R, 0))
        make_face()
    curve_all_shields_piece_15b = extrude(amount=8.1, mode=Mode.PRIVATE)
    curve_all_shields_piece_15b = split(curve_all_shields_piece_15b, bisect_by=Plane(origin=(-28.526395114, 8.2, 1.226395114), z_dir=(0, -1, 0)), keep=Keep.TOP, mode=Mode.PRIVATE)
    curve_all_shields_piece_15 = curve_all_shields_piece_15a & curve_all_shields_piece_15b
    add(curve_all_shields_piece_15)
    with BuildSketch(Plane(origin=(-24.2, 5.7, 1), x_dir=(1, 0, 0), z_dir=(0, 1, 0))) as curve_all_shields_piece_16a_section:
        with BuildLine():
            CenterArc((CURVE_ALL_SHIELDS_R, -CURVE_ALL_SHIELDS_R), CURVE_ALL_SHIELDS_R, 90, 90)
            Line((0, -CURVE_ALL_SHIELDS_R), (0, 0))
            Line((0, 0), (CURVE_ALL_SHIELDS_R, 0))
        make_face()
    curve_all_shields_piece_16a = extrude(amount=8.1, mode=Mode.PRIVATE)
    curve_all_shields_piece_16a = split(curve_all_shields_piece_16a, bisect_by=Plane(origin=(-23.973604886, 8.2, 1.226395114), z_dir=(0, -1, 0)), keep=Keep.TOP, mode=Mode.PRIVATE)
    with BuildSketch(Plane(origin=(-28.3, 8.2, 1), x_dir=(0, -1, 0), z_dir=(1, 0, 0))) as curve_all_shields_piece_16b_section:
        with BuildLine():
            CenterArc((CURVE_ALL_SHIELDS_R, -CURVE_ALL_SHIELDS_R), CURVE_ALL_SHIELDS_R, 90, 90)
            Line((0, -CURVE_ALL_SHIELDS_R), (0, 0))
            Line((0, 0), (CURVE_ALL_SHIELDS_R, 0))
        make_face()
    curve_all_shields_piece_16b = extrude(amount=6.6, mode=Mode.PRIVATE)
    curve_all_shields_piece_16b = split(curve_all_shields_piece_16b, bisect_by=Plane(origin=(-24.2, 7.973604886, 1.226395114), z_dir=(1, 0, 0)), keep=Keep.TOP, mode=Mode.PRIVATE)
    curve_all_shields_piece_16 = curve_all_shields_piece_16a & curve_all_shields_piece_16b
    add(curve_all_shields_piece_16)
    with BuildSketch(Plane(origin=(29.35, -8.8, 1), x_dir=(0, -1, 0), z_dir=(-1, 0, 0))) as curve_all_shields_piece_17a_section:
        with BuildLine():
            CenterArc((CURVE_ALL_SHIELDS_R, CURVE_ALL_SHIELDS_R), CURVE_ALL_SHIELDS_R, 180, 90)
            Line((0, CURVE_ALL_SHIELDS_R), (0, 0))
            Line((0, 0), (CURVE_ALL_SHIELDS_R, 0))
        make_face()
    curve_all_shields_piece_17a = extrude(amount=10.275, mode=Mode.PRIVATE)
    curve_all_shields_piece_17a = split(curve_all_shields_piece_17a, bisect_by=Plane(origin=(21.575, -9.026395114, 1.226395114), z_dir=(-1, 0, 0)), keep=Keep.TOP, mode=Mode.PRIVATE)
    with BuildSketch(Plane(origin=(21.575, -11.3, 1), x_dir=(-1, 0, 0), z_dir=(0, 1, 0))) as curve_all_shields_piece_17b_section:
        with BuildLine():
            CenterArc((CURVE_ALL_SHIELDS_R, CURVE_ALL_SHIELDS_R), CURVE_ALL_SHIELDS_R, 180, 90)
            Line((0, CURVE_ALL_SHIELDS_R), (0, 0))
            Line((0, 0), (CURVE_ALL_SHIELDS_R, 0))
        make_face()
    curve_all_shields_piece_17b = extrude(amount=19.1, mode=Mode.PRIVATE)
    curve_all_shields_piece_17b = split(curve_all_shields_piece_17b, bisect_by=Plane(origin=(21.348604886, -8.8, 1.226395114), z_dir=(0, -1, 0)), keep=Keep.TOP, mode=Mode.PRIVATE)
    curve_all_shields_piece_17 = curve_all_shields_piece_17a & curve_all_shields_piece_17b
    add(curve_all_shields_piece_17)
    with BuildSketch(Plane(origin=(19.075, 7.8, 1), x_dir=(0, 1, 0), z_dir=(1, 0, 0))) as curve_all_shields_piece_18a_section:
        with BuildLine():
            CenterArc((CURVE_ALL_SHIELDS_R, CURVE_ALL_SHIELDS_R), CURVE_ALL_SHIELDS_R, 180, 90)
            Line((0, CURVE_ALL_SHIELDS_R), (0, 0))
            Line((0, 0), (CURVE_ALL_SHIELDS_R, 0))
        make_face()
    curve_all_shields_piece_18a = extrude(amount=10.275, mode=Mode.PRIVATE)
    curve_all_shields_piece_18a = split(curve_all_shields_piece_18a, bisect_by=Plane(origin=(21.575, 8.026395114, 1.226395114), z_dir=(-1, 0, 0)), keep=Keep.TOP, mode=Mode.PRIVATE)
    with BuildSketch(Plane(origin=(21.575, -8.8, 1), x_dir=(-1, 0, 0), z_dir=(0, 1, 0))) as curve_all_shields_piece_18b_section:
        with BuildLine():
            CenterArc((CURVE_ALL_SHIELDS_R, CURVE_ALL_SHIELDS_R), CURVE_ALL_SHIELDS_R, 180, 90)
            Line((0, CURVE_ALL_SHIELDS_R), (0, 0))
            Line((0, 0), (CURVE_ALL_SHIELDS_R, 0))
        make_face()
    curve_all_shields_piece_18b = extrude(amount=19.1, mode=Mode.PRIVATE)
    curve_all_shields_piece_18b = split(curve_all_shields_piece_18b, bisect_by=Plane(origin=(21.348604886, 7.8, 1.226395114), z_dir=(0, 1, 0)), keep=Keep.TOP, mode=Mode.PRIVATE)
    curve_all_shields_piece_18 = curve_all_shields_piece_18a & curve_all_shields_piece_18b
    add(curve_all_shields_piece_18)
    with BuildSketch(Plane(origin=(-20.3, -15.9, 1), x_dir=(0, 1, 0), z_dir=(1, 0, 0))) as curve_all_shields_piece_19a_section:
        with BuildLine():
            CenterArc((CURVE_ALL_SHIELDS_R, CURVE_ALL_SHIELDS_R), CURVE_ALL_SHIELDS_R, 180, 90)
            Line((0, CURVE_ALL_SHIELDS_R), (0, 0))
            Line((0, 0), (CURVE_ALL_SHIELDS_R, 0))
        make_face()
    curve_all_shields_piece_19a = extrude(amount=43.1, mode=Mode.PRIVATE)
    curve_all_shields_piece_19a = split(curve_all_shields_piece_19a, bisect_by=Plane(origin=(20.3, -15.673604886, 1.226395114), z_dir=(1, 0, 0)), keep=Keep.TOP, mode=Mode.PRIVATE)
    with BuildSketch(Plane(origin=(20.3, -13.4, 1), x_dir=(1, 0, 0), z_dir=(0, -1, 0))) as curve_all_shields_piece_19b_section:
        with BuildLine():
            CenterArc((CURVE_ALL_SHIELDS_R, CURVE_ALL_SHIELDS_R), CURVE_ALL_SHIELDS_R, 180, 90)
            Line((0, CURVE_ALL_SHIELDS_R), (0, 0))
            Line((0, 0), (CURVE_ALL_SHIELDS_R, 0))
        make_face()
    curve_all_shields_piece_19b = extrude(amount=10.6, mode=Mode.PRIVATE)
    curve_all_shields_piece_19b = split(curve_all_shields_piece_19b, bisect_by=Plane(origin=(20.526395114, -15.9, 1.226395114), z_dir=(0, 1, 0)), keep=Keep.TOP, mode=Mode.PRIVATE)
    curve_all_shields_piece_19 = curve_all_shields_piece_19a & curve_all_shields_piece_19b
    add(curve_all_shields_piece_19)
    with BuildSketch(Plane(origin=(20.3, -15.9, 1), x_dir=(1, 0, 0), z_dir=(0, -1, 0))) as curve_all_shields_piece_20a_section:
        with BuildLine():
            CenterArc((CURVE_ALL_SHIELDS_R, CURVE_ALL_SHIELDS_R), CURVE_ALL_SHIELDS_R, 180, 90)
            Line((0, CURVE_ALL_SHIELDS_R), (0, 0))
            Line((0, 0), (CURVE_ALL_SHIELDS_R, 0))
        make_face()
    curve_all_shields_piece_20a = extrude(amount=10.6, mode=Mode.PRIVATE)
    curve_all_shields_piece_20a = split(curve_all_shields_piece_20a, bisect_by=Plane(origin=(20.526395114, -25.1, 1.226395114), z_dir=(0, 1, 0)), keep=Keep.TOP, mode=Mode.PRIVATE)
    curve_all_shields_piece_20a = split(curve_all_shields_piece_20a, bisect_by=Plane(origin=(20.526395114, -24, 1.226395114), z_dir=(0, -1, 0)), keep=Keep.TOP, mode=Mode.PRIVATE)
    with BuildSketch(Plane(origin=(22.8, -24, 1), x_dir=(0, -1, 0), z_dir=(-1, 0, 0))) as curve_all_shields_piece_20b_section:
        with BuildLine():
            CenterArc((CURVE_ALL_SHIELDS_R, CURVE_ALL_SHIELDS_R), CURVE_ALL_SHIELDS_R, 180, 90)
            Line((0, CURVE_ALL_SHIELDS_R), (0, 0))
            Line((0, 0), (CURVE_ALL_SHIELDS_R, 0))
        make_face()
    curve_all_shields_piece_20b = extrude(amount=43.1, mode=Mode.PRIVATE)
    curve_all_shields_piece_20b = split(curve_all_shields_piece_20b, bisect_by=Plane(origin=(20.3, -24.226395114, 1.226395114), z_dir=(1, 0, 0)), keep=Keep.TOP, mode=Mode.PRIVATE)
    curve_all_shields_piece_20 = curve_all_shields_piece_20a & curve_all_shields_piece_20b
    add(curve_all_shields_piece_20)


solid = part.part
